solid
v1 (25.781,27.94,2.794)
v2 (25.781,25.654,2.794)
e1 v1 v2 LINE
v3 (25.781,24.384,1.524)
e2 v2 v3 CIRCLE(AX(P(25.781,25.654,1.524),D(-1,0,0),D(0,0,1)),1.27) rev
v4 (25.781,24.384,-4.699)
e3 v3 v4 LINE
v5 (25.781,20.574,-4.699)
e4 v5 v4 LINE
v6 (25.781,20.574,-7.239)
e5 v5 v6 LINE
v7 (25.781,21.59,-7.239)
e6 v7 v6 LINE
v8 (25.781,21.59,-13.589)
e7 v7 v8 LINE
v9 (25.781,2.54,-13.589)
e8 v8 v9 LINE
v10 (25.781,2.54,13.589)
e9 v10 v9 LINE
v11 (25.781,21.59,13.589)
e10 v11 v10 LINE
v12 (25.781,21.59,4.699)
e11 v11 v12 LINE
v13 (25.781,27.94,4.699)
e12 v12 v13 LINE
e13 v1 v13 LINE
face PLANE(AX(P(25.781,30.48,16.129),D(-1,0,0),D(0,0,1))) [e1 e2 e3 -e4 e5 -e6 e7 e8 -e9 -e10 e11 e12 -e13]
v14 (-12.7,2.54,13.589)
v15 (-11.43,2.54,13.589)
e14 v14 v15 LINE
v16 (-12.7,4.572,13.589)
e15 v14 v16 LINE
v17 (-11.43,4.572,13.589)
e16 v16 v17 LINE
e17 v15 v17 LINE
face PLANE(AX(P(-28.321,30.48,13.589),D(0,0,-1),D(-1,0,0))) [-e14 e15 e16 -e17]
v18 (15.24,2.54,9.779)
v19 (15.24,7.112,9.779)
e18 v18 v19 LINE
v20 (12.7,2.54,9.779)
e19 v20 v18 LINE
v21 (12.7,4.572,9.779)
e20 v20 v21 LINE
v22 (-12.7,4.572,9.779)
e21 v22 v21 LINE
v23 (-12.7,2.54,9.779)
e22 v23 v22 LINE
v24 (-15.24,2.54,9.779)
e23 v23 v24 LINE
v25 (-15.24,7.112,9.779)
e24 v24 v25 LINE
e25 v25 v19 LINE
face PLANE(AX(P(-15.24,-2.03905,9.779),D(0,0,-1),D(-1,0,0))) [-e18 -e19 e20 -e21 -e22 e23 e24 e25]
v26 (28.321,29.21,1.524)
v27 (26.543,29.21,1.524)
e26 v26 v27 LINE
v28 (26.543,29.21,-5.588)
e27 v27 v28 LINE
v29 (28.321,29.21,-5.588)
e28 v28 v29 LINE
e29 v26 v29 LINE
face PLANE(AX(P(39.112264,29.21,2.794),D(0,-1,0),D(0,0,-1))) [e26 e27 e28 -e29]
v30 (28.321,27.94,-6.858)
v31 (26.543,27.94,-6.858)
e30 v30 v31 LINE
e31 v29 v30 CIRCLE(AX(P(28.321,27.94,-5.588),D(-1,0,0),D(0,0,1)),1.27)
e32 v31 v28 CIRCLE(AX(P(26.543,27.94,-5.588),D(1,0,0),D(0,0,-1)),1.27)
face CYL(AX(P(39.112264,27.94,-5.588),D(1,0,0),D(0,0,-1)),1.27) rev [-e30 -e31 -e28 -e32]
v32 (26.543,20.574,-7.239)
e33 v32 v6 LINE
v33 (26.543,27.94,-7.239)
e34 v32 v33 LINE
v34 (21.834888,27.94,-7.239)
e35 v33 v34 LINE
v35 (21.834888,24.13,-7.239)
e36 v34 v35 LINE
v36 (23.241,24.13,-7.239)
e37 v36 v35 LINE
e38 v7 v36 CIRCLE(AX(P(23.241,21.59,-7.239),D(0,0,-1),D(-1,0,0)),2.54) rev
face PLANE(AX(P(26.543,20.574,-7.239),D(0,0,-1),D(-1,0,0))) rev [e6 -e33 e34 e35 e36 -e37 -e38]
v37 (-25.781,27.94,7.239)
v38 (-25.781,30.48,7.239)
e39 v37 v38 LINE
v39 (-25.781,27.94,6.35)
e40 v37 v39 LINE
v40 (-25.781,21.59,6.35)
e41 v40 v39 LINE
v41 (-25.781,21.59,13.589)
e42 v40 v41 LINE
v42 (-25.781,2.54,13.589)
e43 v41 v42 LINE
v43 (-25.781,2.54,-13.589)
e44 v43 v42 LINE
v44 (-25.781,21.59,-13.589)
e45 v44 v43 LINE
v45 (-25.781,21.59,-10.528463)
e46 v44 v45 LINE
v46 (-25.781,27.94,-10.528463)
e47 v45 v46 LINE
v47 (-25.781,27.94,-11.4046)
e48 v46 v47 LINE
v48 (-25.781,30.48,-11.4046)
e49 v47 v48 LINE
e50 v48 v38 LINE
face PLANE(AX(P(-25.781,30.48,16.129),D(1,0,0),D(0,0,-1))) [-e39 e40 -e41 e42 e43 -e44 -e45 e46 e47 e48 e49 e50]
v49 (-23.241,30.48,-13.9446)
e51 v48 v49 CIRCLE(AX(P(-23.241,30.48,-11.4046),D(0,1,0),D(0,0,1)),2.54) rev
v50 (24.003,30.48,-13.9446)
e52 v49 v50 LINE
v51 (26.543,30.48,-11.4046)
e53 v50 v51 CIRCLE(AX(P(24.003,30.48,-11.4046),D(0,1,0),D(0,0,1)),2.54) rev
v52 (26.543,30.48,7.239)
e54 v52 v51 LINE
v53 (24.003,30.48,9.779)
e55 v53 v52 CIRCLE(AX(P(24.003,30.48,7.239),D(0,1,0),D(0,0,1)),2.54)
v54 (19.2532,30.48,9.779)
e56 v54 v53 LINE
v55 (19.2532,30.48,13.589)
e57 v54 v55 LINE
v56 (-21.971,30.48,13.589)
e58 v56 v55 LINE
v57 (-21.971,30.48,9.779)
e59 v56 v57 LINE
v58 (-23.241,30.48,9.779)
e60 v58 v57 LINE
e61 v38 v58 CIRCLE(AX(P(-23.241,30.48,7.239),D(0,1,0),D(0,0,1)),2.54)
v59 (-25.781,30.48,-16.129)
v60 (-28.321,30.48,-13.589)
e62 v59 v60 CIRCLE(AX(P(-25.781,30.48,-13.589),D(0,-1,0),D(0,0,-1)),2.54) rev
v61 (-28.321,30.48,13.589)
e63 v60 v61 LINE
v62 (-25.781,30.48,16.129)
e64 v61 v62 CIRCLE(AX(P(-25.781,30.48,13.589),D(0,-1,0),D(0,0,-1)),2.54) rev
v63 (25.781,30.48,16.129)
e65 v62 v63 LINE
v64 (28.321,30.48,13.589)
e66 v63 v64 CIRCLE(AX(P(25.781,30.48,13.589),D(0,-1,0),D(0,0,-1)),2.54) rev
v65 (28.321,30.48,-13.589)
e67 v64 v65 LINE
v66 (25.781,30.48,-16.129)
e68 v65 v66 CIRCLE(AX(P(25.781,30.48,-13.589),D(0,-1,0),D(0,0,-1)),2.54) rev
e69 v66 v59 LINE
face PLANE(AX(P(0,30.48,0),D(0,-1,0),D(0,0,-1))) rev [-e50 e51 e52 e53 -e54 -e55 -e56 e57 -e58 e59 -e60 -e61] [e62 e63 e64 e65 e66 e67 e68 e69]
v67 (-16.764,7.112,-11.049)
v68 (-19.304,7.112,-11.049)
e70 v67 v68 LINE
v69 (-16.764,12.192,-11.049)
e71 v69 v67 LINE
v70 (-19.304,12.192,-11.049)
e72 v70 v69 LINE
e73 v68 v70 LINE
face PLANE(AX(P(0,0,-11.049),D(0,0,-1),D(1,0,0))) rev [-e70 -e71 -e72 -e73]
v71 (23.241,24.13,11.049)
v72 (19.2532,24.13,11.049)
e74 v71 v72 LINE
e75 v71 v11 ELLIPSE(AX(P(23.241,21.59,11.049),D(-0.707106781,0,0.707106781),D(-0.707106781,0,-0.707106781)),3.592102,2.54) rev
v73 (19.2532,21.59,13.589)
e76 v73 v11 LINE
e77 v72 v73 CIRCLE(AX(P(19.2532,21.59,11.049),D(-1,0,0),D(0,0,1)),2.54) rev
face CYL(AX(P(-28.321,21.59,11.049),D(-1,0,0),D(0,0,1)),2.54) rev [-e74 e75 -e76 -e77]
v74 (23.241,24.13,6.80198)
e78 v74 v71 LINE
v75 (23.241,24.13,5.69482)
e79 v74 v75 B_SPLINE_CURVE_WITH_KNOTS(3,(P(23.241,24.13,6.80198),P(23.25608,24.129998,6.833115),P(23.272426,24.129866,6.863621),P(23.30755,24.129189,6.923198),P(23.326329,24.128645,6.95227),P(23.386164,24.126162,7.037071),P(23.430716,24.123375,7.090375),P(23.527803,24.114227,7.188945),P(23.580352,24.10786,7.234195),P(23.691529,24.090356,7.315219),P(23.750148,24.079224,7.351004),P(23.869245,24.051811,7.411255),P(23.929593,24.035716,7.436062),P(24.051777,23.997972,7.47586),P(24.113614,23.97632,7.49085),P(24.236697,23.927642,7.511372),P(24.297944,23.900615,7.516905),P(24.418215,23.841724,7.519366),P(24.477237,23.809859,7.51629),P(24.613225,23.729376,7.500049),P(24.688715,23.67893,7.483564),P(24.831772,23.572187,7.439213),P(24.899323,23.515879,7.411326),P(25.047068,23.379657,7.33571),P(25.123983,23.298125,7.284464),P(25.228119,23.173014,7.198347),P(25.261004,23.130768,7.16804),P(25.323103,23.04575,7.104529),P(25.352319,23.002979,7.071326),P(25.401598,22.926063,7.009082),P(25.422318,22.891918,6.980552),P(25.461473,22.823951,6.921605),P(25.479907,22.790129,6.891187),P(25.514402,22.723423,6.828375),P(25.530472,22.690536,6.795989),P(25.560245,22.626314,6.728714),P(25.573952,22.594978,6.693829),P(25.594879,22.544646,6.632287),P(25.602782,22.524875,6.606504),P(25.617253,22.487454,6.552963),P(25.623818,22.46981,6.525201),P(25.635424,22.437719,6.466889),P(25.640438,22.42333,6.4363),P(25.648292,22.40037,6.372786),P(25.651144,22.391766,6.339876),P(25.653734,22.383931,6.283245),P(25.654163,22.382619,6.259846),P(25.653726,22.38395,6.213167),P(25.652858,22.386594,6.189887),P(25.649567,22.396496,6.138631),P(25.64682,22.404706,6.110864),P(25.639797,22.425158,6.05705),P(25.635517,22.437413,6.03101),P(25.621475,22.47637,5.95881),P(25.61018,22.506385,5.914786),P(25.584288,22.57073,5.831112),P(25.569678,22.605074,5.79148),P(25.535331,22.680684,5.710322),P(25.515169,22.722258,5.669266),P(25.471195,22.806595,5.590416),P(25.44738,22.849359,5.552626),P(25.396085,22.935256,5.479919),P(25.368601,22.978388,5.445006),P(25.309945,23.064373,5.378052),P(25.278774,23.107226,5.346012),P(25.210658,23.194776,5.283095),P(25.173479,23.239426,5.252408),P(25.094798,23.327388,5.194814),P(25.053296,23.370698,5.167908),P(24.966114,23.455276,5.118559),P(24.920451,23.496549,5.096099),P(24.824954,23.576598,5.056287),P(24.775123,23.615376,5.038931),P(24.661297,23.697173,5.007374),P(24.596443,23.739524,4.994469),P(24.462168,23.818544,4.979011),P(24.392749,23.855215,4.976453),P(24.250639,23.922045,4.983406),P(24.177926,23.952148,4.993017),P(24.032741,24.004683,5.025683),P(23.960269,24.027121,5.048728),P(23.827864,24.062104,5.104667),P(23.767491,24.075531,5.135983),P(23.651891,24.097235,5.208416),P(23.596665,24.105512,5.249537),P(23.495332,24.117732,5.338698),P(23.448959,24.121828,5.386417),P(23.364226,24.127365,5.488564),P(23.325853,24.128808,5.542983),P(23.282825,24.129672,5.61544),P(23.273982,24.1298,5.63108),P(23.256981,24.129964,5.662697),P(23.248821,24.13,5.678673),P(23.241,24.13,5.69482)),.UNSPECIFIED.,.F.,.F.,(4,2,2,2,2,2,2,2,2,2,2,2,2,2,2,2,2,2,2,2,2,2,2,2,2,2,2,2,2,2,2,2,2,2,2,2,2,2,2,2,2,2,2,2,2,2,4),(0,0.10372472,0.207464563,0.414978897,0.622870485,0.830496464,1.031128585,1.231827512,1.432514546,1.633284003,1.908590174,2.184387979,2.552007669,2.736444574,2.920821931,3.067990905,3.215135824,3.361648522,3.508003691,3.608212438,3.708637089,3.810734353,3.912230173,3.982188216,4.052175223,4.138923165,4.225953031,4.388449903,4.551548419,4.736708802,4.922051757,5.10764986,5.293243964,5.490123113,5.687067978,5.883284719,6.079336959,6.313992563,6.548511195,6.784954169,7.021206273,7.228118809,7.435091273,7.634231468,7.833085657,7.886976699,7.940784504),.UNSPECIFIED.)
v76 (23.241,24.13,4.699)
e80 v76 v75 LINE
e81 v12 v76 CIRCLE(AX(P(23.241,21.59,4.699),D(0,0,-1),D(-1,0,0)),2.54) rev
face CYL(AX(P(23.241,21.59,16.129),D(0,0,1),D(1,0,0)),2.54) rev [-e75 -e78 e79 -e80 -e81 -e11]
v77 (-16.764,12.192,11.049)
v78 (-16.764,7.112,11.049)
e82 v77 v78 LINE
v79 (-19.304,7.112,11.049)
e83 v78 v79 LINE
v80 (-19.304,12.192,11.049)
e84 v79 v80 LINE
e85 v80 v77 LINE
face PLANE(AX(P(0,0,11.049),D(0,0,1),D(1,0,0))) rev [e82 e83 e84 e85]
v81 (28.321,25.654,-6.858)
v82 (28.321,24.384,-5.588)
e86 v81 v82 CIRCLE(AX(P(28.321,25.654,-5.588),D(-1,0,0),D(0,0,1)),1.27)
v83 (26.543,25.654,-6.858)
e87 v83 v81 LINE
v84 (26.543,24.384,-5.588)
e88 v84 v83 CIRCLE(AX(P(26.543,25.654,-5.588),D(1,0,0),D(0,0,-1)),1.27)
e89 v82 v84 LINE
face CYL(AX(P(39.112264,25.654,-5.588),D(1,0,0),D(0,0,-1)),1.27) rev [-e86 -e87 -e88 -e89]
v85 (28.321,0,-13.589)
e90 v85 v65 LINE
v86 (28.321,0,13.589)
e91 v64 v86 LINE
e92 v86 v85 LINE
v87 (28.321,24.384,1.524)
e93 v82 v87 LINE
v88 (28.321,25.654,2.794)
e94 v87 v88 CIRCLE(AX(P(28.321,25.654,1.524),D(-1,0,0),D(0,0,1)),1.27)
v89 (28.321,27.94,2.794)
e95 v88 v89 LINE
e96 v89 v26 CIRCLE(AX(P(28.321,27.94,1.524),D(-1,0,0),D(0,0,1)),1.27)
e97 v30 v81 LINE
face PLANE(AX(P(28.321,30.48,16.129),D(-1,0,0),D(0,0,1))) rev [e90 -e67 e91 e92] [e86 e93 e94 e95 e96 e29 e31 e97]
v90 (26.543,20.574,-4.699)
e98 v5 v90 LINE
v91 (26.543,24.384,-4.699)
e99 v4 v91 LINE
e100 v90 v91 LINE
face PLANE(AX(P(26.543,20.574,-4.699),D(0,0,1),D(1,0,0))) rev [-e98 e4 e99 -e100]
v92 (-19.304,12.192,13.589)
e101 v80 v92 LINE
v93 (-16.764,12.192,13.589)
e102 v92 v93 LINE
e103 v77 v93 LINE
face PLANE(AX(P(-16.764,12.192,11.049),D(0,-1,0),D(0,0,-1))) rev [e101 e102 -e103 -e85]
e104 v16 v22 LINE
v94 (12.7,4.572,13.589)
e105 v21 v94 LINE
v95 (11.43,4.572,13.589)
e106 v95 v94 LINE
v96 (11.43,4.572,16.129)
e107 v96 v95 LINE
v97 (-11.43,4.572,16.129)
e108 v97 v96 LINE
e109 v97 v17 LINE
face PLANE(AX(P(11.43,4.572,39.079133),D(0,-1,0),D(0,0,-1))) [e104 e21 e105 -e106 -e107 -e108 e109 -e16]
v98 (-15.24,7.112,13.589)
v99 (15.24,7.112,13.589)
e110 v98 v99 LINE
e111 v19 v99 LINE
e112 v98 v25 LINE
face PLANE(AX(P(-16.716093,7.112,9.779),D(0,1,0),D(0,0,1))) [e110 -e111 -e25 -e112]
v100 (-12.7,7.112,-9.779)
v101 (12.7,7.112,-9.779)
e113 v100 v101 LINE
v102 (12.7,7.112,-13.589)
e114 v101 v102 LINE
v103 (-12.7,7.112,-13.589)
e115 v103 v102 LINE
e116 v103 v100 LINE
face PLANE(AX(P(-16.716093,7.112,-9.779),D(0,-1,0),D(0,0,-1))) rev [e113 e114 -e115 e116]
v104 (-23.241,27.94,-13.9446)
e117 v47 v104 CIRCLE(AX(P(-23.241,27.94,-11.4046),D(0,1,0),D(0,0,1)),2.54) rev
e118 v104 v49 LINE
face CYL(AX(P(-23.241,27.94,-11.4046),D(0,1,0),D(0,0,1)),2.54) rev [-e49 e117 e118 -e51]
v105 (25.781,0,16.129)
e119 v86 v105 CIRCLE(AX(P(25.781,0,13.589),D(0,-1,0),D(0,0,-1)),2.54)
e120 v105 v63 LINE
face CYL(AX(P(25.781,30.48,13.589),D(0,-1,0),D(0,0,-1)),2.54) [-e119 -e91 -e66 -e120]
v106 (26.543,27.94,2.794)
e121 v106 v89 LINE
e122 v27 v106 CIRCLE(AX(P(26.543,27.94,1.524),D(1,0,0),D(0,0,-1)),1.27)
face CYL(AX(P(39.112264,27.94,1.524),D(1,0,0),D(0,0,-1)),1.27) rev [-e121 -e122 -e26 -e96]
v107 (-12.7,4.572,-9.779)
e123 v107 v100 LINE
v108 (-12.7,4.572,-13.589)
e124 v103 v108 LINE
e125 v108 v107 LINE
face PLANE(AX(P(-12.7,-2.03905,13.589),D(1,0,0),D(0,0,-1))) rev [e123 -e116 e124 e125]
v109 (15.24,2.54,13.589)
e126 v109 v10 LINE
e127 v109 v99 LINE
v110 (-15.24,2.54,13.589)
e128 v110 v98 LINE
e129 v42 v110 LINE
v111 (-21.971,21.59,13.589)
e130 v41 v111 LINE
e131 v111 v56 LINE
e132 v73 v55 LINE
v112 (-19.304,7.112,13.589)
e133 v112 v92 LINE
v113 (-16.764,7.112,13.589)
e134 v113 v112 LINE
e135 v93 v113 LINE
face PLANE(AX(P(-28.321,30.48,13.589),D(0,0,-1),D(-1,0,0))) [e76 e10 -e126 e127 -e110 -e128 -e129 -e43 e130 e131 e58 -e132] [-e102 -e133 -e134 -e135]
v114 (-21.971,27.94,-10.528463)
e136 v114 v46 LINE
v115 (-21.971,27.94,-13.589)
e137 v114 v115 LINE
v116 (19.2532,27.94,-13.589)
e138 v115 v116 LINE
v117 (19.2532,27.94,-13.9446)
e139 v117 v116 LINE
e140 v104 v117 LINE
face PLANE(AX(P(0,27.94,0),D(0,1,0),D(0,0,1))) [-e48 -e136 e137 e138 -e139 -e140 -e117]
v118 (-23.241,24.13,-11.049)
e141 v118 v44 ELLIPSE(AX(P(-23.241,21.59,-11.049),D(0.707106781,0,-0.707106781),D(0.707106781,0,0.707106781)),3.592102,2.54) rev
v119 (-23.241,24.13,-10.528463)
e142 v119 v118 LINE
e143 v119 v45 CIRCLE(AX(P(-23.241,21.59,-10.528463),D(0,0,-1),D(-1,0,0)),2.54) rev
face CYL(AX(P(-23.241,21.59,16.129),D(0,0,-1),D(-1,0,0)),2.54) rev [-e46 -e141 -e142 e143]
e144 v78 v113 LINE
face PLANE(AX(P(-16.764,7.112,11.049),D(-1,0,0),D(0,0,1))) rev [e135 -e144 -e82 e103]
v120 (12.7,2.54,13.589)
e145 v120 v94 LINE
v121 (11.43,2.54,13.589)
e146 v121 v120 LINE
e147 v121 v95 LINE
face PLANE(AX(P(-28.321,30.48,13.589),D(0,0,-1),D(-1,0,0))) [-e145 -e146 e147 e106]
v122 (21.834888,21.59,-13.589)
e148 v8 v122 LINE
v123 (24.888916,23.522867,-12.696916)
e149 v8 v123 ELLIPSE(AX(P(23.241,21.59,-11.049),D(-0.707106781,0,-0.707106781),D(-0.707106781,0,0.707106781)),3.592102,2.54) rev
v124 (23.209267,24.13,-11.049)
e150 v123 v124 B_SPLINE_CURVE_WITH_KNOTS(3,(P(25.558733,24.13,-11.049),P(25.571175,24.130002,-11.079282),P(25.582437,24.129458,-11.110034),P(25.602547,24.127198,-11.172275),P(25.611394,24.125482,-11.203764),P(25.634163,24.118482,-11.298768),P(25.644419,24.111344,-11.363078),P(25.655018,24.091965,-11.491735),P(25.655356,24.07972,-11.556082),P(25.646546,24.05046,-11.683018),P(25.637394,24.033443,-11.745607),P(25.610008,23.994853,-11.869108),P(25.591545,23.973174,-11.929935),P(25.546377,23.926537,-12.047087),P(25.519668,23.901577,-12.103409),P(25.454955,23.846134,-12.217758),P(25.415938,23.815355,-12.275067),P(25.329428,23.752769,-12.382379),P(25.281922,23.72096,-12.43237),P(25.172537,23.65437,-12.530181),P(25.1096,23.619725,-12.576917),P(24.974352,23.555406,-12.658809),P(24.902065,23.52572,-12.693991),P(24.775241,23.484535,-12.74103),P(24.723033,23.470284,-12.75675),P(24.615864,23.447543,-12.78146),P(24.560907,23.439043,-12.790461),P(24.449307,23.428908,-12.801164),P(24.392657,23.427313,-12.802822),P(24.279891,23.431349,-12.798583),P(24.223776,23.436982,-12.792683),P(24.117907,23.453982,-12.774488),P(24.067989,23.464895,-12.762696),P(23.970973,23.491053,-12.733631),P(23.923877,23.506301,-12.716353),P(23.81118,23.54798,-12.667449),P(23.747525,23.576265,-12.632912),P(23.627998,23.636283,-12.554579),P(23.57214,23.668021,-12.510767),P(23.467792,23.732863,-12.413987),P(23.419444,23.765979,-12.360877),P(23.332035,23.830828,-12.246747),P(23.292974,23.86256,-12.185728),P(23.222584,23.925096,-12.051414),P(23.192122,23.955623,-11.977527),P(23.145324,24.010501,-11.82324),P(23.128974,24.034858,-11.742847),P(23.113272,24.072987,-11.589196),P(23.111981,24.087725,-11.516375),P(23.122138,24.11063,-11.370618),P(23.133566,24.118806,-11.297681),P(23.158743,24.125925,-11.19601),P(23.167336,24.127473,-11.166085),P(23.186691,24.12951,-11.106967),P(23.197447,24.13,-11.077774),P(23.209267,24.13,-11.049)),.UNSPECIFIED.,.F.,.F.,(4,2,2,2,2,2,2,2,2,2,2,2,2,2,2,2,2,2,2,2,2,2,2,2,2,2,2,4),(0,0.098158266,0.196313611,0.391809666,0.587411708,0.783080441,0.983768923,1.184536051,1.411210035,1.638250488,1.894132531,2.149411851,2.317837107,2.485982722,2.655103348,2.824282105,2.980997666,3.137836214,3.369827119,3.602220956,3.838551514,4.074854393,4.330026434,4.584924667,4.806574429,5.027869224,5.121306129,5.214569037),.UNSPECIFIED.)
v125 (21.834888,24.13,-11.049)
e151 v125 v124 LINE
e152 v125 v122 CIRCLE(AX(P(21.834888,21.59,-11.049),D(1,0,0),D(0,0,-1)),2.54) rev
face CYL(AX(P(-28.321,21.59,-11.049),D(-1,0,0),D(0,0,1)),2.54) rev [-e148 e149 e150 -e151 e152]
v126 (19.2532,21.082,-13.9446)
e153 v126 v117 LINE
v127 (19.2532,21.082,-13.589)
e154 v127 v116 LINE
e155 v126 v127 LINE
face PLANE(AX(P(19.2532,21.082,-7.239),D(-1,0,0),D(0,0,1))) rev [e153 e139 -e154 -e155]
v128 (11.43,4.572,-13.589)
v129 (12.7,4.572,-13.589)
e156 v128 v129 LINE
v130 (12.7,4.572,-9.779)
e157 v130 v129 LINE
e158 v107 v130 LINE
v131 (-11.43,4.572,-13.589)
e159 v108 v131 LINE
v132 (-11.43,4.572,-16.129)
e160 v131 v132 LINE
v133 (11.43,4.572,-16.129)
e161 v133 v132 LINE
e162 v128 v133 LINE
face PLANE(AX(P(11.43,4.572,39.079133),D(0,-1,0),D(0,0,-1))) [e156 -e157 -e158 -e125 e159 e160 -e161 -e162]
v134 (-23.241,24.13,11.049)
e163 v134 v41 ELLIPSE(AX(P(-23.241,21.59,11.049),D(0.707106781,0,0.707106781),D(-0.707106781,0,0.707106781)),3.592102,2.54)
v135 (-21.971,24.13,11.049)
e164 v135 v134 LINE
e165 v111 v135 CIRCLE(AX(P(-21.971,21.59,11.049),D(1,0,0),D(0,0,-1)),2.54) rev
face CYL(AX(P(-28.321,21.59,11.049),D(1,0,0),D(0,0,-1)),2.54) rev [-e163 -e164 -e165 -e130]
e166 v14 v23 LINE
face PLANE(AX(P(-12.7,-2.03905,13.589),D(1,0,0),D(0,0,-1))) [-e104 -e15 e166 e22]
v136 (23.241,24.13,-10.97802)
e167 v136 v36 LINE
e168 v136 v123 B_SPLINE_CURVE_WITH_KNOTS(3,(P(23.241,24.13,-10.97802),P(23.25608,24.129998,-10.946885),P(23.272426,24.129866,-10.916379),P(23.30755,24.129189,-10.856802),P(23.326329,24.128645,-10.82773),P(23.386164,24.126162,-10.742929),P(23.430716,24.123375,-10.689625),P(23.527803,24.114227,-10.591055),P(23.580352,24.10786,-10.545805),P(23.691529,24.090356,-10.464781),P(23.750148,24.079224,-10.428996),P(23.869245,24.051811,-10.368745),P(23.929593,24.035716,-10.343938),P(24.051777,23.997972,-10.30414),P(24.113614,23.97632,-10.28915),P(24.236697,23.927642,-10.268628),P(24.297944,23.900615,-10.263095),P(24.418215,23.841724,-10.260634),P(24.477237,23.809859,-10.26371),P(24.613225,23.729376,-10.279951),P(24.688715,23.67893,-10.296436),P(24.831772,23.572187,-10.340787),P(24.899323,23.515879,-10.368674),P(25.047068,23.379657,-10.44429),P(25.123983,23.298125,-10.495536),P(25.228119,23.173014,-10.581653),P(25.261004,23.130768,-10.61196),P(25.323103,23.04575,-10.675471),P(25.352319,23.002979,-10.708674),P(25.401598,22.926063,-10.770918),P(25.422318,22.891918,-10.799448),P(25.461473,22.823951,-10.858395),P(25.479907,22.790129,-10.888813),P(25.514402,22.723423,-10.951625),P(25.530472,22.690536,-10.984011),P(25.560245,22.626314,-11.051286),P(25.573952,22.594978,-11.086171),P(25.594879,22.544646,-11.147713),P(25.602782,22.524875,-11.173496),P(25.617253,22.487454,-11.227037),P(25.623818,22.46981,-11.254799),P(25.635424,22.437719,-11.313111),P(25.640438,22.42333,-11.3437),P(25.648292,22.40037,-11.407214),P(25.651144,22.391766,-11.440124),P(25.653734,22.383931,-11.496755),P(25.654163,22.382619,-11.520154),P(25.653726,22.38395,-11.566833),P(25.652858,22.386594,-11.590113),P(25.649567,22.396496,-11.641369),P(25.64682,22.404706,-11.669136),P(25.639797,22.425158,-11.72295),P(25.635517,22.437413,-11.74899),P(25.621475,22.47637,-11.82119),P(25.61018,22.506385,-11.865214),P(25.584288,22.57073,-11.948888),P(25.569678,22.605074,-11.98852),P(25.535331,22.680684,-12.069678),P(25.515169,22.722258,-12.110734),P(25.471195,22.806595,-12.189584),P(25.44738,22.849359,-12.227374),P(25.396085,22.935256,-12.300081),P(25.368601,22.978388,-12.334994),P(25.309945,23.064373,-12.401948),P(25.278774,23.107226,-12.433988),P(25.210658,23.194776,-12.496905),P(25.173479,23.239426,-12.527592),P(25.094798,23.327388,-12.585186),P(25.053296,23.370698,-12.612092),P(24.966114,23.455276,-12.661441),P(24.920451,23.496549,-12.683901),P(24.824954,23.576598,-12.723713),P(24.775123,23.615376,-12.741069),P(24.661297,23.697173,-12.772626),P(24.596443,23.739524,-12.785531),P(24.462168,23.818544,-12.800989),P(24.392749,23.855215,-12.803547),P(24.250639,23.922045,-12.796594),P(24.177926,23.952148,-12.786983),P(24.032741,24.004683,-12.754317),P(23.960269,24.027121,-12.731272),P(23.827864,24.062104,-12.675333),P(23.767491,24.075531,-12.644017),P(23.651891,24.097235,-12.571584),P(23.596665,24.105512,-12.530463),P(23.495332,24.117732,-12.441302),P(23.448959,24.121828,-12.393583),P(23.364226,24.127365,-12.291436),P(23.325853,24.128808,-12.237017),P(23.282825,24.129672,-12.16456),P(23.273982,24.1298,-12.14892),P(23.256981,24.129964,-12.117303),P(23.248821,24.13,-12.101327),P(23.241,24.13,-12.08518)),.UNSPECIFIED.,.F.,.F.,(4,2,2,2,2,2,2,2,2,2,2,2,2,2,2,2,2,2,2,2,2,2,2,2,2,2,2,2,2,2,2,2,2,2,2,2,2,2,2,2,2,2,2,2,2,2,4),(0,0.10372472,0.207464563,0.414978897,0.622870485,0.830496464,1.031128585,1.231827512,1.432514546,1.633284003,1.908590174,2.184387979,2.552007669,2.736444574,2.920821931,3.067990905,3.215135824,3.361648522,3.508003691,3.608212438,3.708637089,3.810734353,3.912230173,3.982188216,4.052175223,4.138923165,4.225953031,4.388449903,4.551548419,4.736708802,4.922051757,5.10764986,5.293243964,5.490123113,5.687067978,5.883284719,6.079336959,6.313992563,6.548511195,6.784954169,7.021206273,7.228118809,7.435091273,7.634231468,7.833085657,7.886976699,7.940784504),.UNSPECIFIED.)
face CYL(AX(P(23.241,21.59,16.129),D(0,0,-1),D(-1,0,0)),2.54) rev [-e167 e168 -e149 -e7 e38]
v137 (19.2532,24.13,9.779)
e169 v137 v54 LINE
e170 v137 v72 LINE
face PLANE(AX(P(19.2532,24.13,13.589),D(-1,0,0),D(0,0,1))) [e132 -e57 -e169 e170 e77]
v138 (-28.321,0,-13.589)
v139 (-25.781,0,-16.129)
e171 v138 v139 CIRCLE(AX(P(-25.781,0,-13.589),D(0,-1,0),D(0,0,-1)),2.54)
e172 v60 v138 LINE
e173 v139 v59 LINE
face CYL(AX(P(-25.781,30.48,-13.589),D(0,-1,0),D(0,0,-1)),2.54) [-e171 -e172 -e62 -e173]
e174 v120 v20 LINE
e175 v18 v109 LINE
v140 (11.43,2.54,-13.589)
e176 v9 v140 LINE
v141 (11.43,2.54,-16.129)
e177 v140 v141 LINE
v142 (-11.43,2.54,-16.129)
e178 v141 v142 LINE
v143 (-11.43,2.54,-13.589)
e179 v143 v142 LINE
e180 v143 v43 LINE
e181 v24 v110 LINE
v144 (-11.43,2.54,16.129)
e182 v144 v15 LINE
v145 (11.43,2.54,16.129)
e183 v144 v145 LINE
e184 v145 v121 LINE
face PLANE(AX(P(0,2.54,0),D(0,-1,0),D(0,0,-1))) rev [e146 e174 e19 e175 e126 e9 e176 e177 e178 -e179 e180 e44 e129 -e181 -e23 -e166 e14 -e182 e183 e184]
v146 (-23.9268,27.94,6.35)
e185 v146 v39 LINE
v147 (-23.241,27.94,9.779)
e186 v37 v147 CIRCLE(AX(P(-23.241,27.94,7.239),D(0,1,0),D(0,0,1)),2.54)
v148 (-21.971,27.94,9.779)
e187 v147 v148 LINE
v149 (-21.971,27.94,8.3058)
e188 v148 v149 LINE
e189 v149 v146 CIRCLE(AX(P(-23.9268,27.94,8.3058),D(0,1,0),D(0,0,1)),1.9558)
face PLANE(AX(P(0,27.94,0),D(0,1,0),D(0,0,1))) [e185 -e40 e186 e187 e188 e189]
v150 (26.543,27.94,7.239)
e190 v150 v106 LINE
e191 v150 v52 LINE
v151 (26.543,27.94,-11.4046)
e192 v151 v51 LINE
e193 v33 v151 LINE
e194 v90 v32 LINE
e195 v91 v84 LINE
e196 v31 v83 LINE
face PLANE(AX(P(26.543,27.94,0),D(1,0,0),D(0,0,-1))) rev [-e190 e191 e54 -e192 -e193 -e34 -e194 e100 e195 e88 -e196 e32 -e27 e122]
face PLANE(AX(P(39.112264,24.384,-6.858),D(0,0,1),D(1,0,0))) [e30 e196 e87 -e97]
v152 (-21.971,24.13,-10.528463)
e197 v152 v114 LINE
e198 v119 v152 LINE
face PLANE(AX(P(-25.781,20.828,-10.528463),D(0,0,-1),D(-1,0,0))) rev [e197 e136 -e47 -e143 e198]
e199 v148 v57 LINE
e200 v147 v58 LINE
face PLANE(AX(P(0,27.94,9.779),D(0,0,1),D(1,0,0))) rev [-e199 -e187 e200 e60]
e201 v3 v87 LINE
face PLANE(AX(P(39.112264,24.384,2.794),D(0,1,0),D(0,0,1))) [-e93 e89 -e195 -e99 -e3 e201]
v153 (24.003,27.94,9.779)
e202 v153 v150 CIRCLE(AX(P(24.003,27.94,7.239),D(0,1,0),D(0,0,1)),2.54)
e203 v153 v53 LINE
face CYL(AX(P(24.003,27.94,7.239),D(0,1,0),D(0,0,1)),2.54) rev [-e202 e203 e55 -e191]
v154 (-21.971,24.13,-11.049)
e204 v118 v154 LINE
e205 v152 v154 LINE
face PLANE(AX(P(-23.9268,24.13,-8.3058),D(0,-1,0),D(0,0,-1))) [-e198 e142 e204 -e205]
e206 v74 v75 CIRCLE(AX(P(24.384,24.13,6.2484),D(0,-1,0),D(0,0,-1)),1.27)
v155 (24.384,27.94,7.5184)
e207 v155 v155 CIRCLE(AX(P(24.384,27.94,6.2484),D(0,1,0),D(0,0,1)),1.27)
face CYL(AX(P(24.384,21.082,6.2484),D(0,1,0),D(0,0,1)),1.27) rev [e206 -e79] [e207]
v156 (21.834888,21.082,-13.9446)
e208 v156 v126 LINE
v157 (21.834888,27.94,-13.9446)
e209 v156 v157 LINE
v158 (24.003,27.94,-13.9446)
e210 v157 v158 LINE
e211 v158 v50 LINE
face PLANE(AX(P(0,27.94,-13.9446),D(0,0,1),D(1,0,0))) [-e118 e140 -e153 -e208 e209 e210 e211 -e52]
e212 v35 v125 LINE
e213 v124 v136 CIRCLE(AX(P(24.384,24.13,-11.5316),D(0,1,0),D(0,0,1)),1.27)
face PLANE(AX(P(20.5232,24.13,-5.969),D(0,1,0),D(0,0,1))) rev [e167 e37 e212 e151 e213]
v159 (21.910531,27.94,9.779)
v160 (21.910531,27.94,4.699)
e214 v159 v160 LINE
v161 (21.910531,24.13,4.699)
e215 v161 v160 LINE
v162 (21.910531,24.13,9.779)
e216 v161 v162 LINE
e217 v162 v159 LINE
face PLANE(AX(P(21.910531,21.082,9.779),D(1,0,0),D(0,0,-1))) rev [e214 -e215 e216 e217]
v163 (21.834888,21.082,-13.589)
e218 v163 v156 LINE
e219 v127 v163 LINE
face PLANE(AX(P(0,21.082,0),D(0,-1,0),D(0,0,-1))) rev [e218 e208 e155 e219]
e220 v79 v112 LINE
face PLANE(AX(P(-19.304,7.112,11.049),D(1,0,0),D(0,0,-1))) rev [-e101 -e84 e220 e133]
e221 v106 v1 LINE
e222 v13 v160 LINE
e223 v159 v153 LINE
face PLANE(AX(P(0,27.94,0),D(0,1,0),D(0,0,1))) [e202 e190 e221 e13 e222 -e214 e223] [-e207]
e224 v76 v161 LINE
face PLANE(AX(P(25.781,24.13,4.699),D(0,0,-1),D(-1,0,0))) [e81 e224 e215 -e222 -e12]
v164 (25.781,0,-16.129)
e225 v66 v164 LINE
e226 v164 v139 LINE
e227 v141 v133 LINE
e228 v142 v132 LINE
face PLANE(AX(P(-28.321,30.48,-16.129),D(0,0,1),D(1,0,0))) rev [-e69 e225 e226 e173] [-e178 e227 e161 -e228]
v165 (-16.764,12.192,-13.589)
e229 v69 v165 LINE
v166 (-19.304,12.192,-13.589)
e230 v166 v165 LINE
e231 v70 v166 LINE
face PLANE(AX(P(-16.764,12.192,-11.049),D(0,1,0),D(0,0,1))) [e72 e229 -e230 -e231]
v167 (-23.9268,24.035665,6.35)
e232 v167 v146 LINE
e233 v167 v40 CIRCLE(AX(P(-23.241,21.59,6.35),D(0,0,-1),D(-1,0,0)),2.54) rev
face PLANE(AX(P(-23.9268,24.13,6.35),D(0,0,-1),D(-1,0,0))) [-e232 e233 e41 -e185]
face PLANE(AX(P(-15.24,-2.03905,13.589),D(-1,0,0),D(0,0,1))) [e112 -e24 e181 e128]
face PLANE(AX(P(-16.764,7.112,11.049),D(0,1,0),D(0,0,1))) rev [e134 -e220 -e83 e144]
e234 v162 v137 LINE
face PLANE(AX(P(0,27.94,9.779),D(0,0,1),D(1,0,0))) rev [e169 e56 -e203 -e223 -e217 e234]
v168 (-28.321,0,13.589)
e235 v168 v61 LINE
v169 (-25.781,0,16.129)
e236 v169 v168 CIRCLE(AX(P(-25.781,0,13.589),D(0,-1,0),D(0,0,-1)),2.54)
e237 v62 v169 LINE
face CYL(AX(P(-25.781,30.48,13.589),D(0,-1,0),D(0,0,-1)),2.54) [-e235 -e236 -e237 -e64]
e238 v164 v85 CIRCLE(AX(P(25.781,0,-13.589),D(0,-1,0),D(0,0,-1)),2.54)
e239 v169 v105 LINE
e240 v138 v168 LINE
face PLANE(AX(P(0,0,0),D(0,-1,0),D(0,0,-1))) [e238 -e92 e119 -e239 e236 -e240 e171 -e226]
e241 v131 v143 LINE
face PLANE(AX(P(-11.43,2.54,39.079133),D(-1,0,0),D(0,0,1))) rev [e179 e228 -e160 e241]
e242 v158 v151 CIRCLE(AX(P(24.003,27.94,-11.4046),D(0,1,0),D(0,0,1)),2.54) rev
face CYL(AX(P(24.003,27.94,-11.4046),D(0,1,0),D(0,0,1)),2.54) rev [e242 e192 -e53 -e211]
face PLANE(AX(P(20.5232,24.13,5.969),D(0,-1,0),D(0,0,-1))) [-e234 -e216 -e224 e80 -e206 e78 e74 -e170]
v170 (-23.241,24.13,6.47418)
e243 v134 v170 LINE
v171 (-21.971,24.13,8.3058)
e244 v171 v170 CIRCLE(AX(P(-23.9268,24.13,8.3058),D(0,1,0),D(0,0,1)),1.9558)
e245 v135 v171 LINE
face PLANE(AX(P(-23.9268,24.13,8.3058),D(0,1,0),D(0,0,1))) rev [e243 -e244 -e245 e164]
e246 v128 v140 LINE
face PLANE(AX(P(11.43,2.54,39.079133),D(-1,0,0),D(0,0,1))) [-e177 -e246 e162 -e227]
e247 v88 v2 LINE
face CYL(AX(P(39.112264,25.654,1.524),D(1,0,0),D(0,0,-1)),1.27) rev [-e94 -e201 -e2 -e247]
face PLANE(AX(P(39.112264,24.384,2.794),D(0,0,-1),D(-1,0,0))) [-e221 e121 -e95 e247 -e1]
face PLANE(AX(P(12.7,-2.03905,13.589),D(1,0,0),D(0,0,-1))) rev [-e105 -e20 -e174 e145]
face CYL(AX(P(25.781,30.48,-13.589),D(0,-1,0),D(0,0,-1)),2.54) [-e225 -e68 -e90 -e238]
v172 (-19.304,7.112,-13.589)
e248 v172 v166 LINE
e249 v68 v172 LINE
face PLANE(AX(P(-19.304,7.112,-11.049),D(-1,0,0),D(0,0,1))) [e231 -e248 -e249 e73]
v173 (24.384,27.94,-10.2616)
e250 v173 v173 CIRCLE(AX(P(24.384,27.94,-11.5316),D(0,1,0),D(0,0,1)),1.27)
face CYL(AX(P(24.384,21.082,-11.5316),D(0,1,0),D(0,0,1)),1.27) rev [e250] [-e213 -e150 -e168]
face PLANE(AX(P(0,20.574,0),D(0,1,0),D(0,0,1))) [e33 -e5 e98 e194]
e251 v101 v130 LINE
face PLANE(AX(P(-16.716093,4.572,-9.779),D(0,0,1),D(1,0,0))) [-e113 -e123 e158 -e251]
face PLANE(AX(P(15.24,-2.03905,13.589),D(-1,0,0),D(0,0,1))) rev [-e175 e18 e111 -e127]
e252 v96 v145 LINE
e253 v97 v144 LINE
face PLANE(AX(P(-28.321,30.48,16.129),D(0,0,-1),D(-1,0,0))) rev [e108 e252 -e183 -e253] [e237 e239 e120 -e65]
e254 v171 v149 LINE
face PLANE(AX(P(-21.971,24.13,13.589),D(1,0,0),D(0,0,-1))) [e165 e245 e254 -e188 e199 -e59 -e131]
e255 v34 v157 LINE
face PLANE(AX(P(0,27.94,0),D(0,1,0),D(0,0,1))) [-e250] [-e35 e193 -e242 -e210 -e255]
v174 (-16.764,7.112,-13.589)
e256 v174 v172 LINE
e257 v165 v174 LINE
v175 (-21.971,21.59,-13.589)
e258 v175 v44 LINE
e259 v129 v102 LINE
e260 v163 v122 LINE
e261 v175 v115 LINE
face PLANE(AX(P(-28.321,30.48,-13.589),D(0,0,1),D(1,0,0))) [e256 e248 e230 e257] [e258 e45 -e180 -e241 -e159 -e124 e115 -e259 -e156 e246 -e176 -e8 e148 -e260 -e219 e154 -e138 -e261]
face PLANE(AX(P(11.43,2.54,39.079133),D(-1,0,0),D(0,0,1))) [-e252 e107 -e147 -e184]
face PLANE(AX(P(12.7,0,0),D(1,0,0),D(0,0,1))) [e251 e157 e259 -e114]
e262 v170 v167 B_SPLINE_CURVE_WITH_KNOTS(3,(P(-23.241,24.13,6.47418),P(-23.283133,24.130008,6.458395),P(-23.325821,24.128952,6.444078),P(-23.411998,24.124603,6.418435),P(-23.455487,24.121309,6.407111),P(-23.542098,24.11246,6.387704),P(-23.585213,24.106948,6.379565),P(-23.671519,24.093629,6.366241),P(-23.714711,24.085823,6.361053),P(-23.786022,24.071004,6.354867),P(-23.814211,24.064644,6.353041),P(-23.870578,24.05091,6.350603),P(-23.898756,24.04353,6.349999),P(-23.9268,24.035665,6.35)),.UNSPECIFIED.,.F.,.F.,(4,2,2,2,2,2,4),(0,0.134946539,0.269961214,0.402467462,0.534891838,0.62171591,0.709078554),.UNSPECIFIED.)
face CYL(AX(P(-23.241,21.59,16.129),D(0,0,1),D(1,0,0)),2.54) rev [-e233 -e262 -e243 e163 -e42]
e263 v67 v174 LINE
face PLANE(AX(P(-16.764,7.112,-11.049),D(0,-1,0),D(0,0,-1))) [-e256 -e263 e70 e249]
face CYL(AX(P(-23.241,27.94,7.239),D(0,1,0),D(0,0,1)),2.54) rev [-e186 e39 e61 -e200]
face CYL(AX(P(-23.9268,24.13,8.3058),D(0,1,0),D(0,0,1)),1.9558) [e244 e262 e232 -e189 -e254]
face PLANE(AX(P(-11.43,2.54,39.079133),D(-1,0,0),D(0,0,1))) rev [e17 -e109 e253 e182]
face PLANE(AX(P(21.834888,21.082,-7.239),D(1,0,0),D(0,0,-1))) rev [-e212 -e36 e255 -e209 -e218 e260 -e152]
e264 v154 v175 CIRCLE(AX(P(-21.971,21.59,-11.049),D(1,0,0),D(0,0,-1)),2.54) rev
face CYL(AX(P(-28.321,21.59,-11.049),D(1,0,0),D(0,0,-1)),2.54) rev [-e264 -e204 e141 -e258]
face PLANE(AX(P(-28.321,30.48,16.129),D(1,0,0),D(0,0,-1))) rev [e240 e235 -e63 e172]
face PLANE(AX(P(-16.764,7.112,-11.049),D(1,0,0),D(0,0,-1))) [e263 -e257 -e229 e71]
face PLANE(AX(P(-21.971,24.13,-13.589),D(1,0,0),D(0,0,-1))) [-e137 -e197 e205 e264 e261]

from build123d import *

# Parameters (mm, degrees)
SKETCH1_W           = 56.642
SKETCH1_H           = 32.258
BOSS_EXTRUDE1_DEPTH = 30.48
SHELL1_T            = -2.54
BOSS_EXTRUDE2_DEPTH = 6.35
FILLET2_R           = 2.54
FILLET3_R           = 2.54
CUT_EXTRUDE9_REACH  = 54.647
SKETCH10_W          = 22.86
SKETCH10_H          = 2.032
BOSS_EXTRUDE3_REACH = 46.623
SKETCH13_W          = 2.54
SKETCH13_H          = 3.81
SKETCH14_W          = 3.81
SKETCH14_H          = 1.27
BOSS_EXTRUDE4_DEPTH = 25.4
CUT_EXTRUDE10_DEPTH = 2.54
CUT_EXTRUDE11_REACH = 46.623
SKETCH16_W          = 9.652
SKETCH16_H          = 4.826
SKETCH11_R          = 1.27
CUT_EXTRUDE12_DEPTH = 9.398
MIRROR2_START       = 4.572
MIRROR2_OUTLINE_W   = 25.4
MIRROR2_OUTLINE_H   = 3.81
MIRROR2_DEPTH       = 2.54
SKETCH17_W          = 2.54
SKETCH17_H          = 3.81
CUT_EXTRUDE13_DEPTH = 23.368
SKETCH18_W          = 7.2898
SKETCH18_H          = 2.54
CUT_EXTRUDE14_DEPTH = 7.366
FILLET4_R           = 1.27
SKETCH19_W          = 2.54
SKETCH19_H          = 5.08
BOSS_EXTRUDE5_DEPTH = 2.54
CUT_EXTRUDE15_START = -23.368
SKETCH20_W          = 2.54
SKETCH20_H          = 3.81
CUT_EXTRUDE15_DEPTH = 23.368
SKETCH22_W          = 2.657331224
SKETCH22_H          = 5.08
CUT_EXTRUDE18_DEPTH = 6.858
SKETCH23_W          = 2.581688451
SKETCH23_H          = 6.7056
CUT_EXTRUDE19_DEPTH = 6.858
SKETCH24_W          = 4.254264989
SKETCH24_H          = 4.461970644
CUT_EXTRUDE20_DEPTH = 7.112


# Read off the part's stored shape, not the designer's step: Mirror2
with BuildPart() as part:
    # Sketch1 → Boss-Extrude1 (new body)
    with BuildSketch(Plane(origin=(0, 0, 0), x_dir=(1, 0, 0), z_dir=(0, 1, 0))):
        Rectangle(SKETCH1_W, SKETCH1_H)
    extrude(amount=BOSS_EXTRUDE1_DEPTH)

    # Shell1
    shell1_openings = [part.faces().sort_by_distance(p)[0] for p in [
        (0, 30.48, 0),
    ]]
    offset(amount=SHELL1_T, openings=shell1_openings, kind=Kind.INTERSECTION)

    # Sketch3 → Boss-Extrude2 (add)
    with BuildSketch(Plane(origin=(0, 30.48, 0), x_dir=(1, 0, 0), z_dir=(0, 1, 0))):
        with BuildLine():
            Line((-25.781, 13.589), (-25.781, 6.35))
            Line((-25.781, 6.35), (-23.9268, 6.35))
            ThreePointArc((-23.9268, 6.35), (-22.543840557, 6.922840557), (-21.971, 8.3058))
            Line((-21.971, 8.3058), (-21.971, 13.589))
            Line((-21.971, 13.589), (-25.781, 13.589))
        make_face()
        with BuildLine():
            Line((-21.971, -13.589), (-21.971, -8.3058))
            ThreePointArc((-21.971, -8.3058), (-22.543840557, -6.922840557), (-23.9268, -6.35))
            Line((-23.9268, -6.35), (-25.781, -6.35))
            Line((-25.781, -6.35), (-25.781, -13.589))
            Line((-25.781, -13.589), (-21.971, -13.589))
        make_face()
        with BuildLine():
            Line((25.781, 13.589), (19.2532, 13.589))
            Line((19.2532, 13.589), (19.2532, 5.969))
            ThreePointArc((19.2532, 5.969), (19.625174388, 5.070974388), (20.5232, 4.699))
            Line((20.5232, 4.699), (25.781, 4.699))
            Line((25.781, 4.699), (25.781, 13.589))
        make_face()
        with BuildLine():
            Line((25.781, -4.699), (25.781, -13.589))
            Line((25.781, -13.589), (19.2532, -13.589))
            Line((19.2532, -13.589), (19.2532, -5.969))
            ThreePointArc((19.2532, -5.969), (19.625174388, -5.070974388), (20.5232, -4.699))
            Line((20.5232, -4.699), (25.781, -4.699))
        make_face()
    extrude(amount=-BOSS_EXTRUDE2_DEPTH)

    # Fillet2
    fillet2_edges = [part.edges().sort_by_distance(p)[0] for p in [
        (28.321, 15.24, 16.129),
        (-28.321, 15.24, 16.129),
        (-28.321, 15.24, -16.129),
        (28.321, 15.24, -16.129),
    ]]
    fillet(fillet2_edges, radius=FILLET2_R)

    # Fillet3
    fillet3_edges = [part.edges().sort_by_distance(p)[0] for p in [
        (-25.781, 24.13, 9.9695),
        (-23.876, 24.13, 13.589),
        (22.5171, 24.13, 13.589),
        (25.781, 24.13, 9.144),
        (-23.876, 24.13, -13.589),
        (-25.781, 24.13, -9.9695),
        (22.5171, 24.13, -13.589),
        (25.781, 24.13, -9.144),
    ]]
    fillet(fillet3_edges, radius=FILLET3_R)

    # Cut-Extrude9: up to this face of the body (flat: up to its plane)
    cut_extrude9_end = Plane(part.part.faces().sort_by_distance((0, 15.24, 16.129))[0])
    # Sketch10 → Cut-Extrude9 (cut, up to the picked face)
    with BuildSketch(Plane(origin=(0, 0, -16.129), x_dir=(-1, 0, 0), z_dir=(0, 0, -1)), mode=Mode.PRIVATE) as cut_extrude9_sk1:
        with Locations((0, 3.556)):
            Rectangle(SKETCH10_W, SKETCH10_H)
    cut_extrude9_tool1 = split(extrude(cut_extrude9_sk1.sketch, amount=-CUT_EXTRUDE9_REACH, mode=Mode.PRIVATE), bisect_by=cut_extrude9_end, keep=Keep.BOTH, mode=Mode.PRIVATE)
    add(cut_extrude9_tool1.solids().sort_by(Axis((0, 3.556, -16.129), (0, 0, 1)))[0], mode=Mode.SUBTRACT)

    # Sketch13 → Boss-Extrude3 (add, up to next)
    with BuildSketch(Plane(origin=(0, 30.48, 0), x_dir=(1, 0, 0), z_dir=(0, 1, 0)), mode=Mode.PRIVATE) as boss_extrude3_sk1:
        with Locations((-13.97, -11.684)):
            Rectangle(SKETCH13_W, SKETCH13_H)
    boss_extrude3_tool1 = extrude(boss_extrude3_sk1.sketch, amount=-BOSS_EXTRUDE3_REACH, mode=Mode.PRIVATE) - part.part
    boss_extrude3 = boss_extrude3_tool1.solids().sort_by_distance((-13.97, 30.48, 11.684))[0]
    add(boss_extrude3)

    # Mirror1: Boss-Extrude3 across plane
    add(boss_extrude3.mirror(Plane(origin=(0, 0, 0), x_dir=(0, 0, 1), z_dir=(1, 0, 0))))

    # Sketch14 → Boss-Extrude4 (add)
    with BuildSketch(Plane.ZY.offset(-12.7)):
        with Locations((11.684, 5.207)):
            Rectangle(SKETCH14_W, SKETCH14_H)
    extrude(amount=BOSS_EXTRUDE4_DEPTH)

    # Sketch15 → Cut-Extrude10 (cut)
    with BuildSketch(Plane(origin=(0, 30.48, 0), x_dir=(1, 0, 0), z_dir=(0, 1, 0))):
        with BuildLine():
            Line((-25.781, 11.4046), (-25.781, 6.35))
            Line((-25.781, 6.35), (-23.9268, 6.35))
            ThreePointArc((-23.9268, 6.35), (-22.543840557, 6.922840557), (-21.971, 8.3058))
            Line((-21.971, 8.3058), (-21.971, 13.589))
            Line((-21.971, 13.589), (19.2532, 13.589))
            Line((19.2532, 13.589), (19.2532, 5.969))
            ThreePointArc((19.2532, 5.969), (19.625174388, 5.070974388), (20.5232, 4.699))
            Line((20.5232, 4.699), (25.781, 4.699))
            Line((25.781, 4.699), (25.781, -4.699))
            Line((25.781, -4.699), (20.5232, -4.699))
            ThreePointArc((20.5232, -4.699), (19.625174388, -5.070974388), (19.2532, -5.969))
            Line((19.2532, -5.969), (19.2532, -9.779))
            Line((19.2532, -9.779), (24.003, -9.779))
            ThreePointArc((24.003, -9.779), (25.799051224, -9.035051224), (26.543, -7.239))
            Line((26.543, -7.239), (26.543, -1.000588636))
            Line((26.543, -1.000588636), (26.543, 5.166188636))
            Line((26.543, 5.166188636), (26.543, 11.4046))
            ThreePointArc((26.543, 11.4046), (25.799051224, 13.200651224), (24.003, 13.9446))
            Line((24.003, 13.9446), (-23.241, 13.9446))
            ThreePointArc((-23.241, 13.9446), (-25.037051224, 13.200651224), (-25.781, 11.4046))
        make_face()
        with BuildLine():
            Line((-25.781, -6.35), (-25.781, -7.239))
            ThreePointArc((-25.781, -7.239), (-25.037051224, -9.035051224), (-23.241, -9.779))
            Line((-23.241, -9.779), (-21.971, -9.779))
            Line((-21.971, -9.779), (-21.971, -8.3058))
            ThreePointArc((-21.971, -8.3058), (-22.543840557, -6.922840557), (-23.9268, -6.35))
            Line((-23.9268, -6.35), (-25.781, -6.35))
        make_face()
    extrude(amount=-CUT_EXTRUDE10_DEPTH, mode=Mode.SUBTRACT)

    # Cut-Extrude11: up to this face of the body (flat: up to its plane)
    cut_extrude11_end = Plane(part.part.faces().sort_by_distance((28.321, 15.24, 0))[0])
    # Sketch16 → Cut-Extrude11 (cut, up to the picked face)
    with BuildSketch(Plane(origin=(0, 0, 0), x_dir=(0, 0, -1), z_dir=(1, 0, 0)), mode=Mode.PRIVATE) as cut_extrude11_sk1:
        with Locations((2.032, 26.797)):
            Rectangle(SKETCH16_W, SKETCH16_H)
    cut_extrude11_tool1 = split(extrude(cut_extrude11_sk1.sketch, amount=CUT_EXTRUDE11_REACH, mode=Mode.PRIVATE), bisect_by=cut_extrude11_end, keep=Keep.BOTH, mode=Mode.PRIVATE)
    add(cut_extrude11_tool1.solids().sort_by(Axis((0, 26.797, -2.032), (1, 0, 0)))[0], mode=Mode.SUBTRACT)

    # Sketch11 → Cut-Extrude12 (cut)
    with BuildSketch(Plane(origin=(0, 30.48, 0), x_dir=(1, 0, 0), z_dir=(0, 1, 0))):
        with Locations(Location((24.384, 11.5316, 0), (0, 0, 270))):
            Circle(SKETCH11_R)
        with Locations(Location((24.384, -6.2484, 0), (0, 0, 270))):
            Circle(SKETCH11_R)
    extrude(amount=-CUT_EXTRUDE12_DEPTH, mode=Mode.SUBTRACT)

    # Mirror2 outline → Mirror2 (add)
    with BuildSketch(Plane(origin=(0, 0, 0), x_dir=(1, 0, 0), z_dir=(0, 1, 0)).offset(MIRROR2_START)):
        with Locations((0, 11.684)):
            Rectangle(MIRROR2_OUTLINE_W, MIRROR2_OUTLINE_H)
        with Locations((0, -11.684)):
            Rectangle(MIRROR2_OUTLINE_W, MIRROR2_OUTLINE_H)
    extrude(amount=MIRROR2_DEPTH)

    # Sketch17 → Cut-Extrude13 (cut)
    with BuildSketch(Plane(origin=(0, 30.48, 0), x_dir=(1, 0, 0), z_dir=(0, 1, 0))):
        with Locations((-13.97, -11.684)):
            Rectangle(SKETCH17_W, SKETCH17_H)
    extrude(amount=-CUT_EXTRUDE13_DEPTH, mode=Mode.SUBTRACT)

    # Sketch18 → Cut-Extrude14 (cut)
    with BuildSketch(Plane(origin=(0, 27.94, 0), x_dir=(1, 0, 0), z_dir=(0, 1, 0))):
        with Locations((22.8981, 5.969)):
            Rectangle(SKETCH18_W, SKETCH18_H)
    extrude(amount=-CUT_EXTRUDE14_DEPTH, mode=Mode.SUBTRACT)

    # Fillet4
    fillet4_edges = [part.edges().sort_by_distance(p)[0] for p in [
        (27.432, 29.21, -6.858),
        (27.432, 24.384, -6.858),
        (27.051, 24.384, 2.794),
        (27.432, 29.21, 2.794),
    ]]
    fillet(fillet4_edges, radius=FILLET4_R)

    # Sketch19 → Boss-Extrude5 (add)
    with BuildSketch(Plane(origin=(0, 0, 13.589), x_dir=(-1, 0, 0), z_dir=(0, 0, -1))):
        with Locations((18.034, 9.652)):
            Rectangle(SKETCH19_W, SKETCH19_H)
    boss_extrude5 = extrude(amount=BOSS_EXTRUDE5_DEPTH)

    # Mirror3: Boss-Extrude5 across plane
    add(boss_extrude5.mirror(Plane.XY))

    # Sketch20 → Cut-Extrude15 (cut)
    with BuildSketch(Plane(origin=(0, 30.48, 0), x_dir=(1, 0, 0), z_dir=(0, 1, 0)).offset(CUT_EXTRUDE15_START)):
        with Locations((13.97, -11.684)):
            Rectangle(SKETCH20_W, SKETCH20_H)
    extrude(amount=CUT_EXTRUDE15_DEPTH, mode=Mode.SUBTRACT)

    # Sketch22 → Cut-Extrude18 (cut)
    with BuildSketch(Plane(origin=(0, 27.94, 0), x_dir=(1, 0, 0), z_dir=(0, 1, 0))):
        with Locations((20.581865612, -7.239)):
            Rectangle(SKETCH22_W, SKETCH22_H)
    extrude(amount=-CUT_EXTRUDE18_DEPTH, mode=Mode.SUBTRACT)

    # Sketch23 → Cut-Extrude19 (cut)
    with BuildSketch(Plane(origin=(0, 27.94, 0), x_dir=(1, 0, 0), z_dir=(0, 1, 0))):
        with Locations((20.544044226, 10.5918)):
            Rectangle(SKETCH23_W, SKETCH23_H)
    extrude(amount=-CUT_EXTRUDE19_DEPTH, mode=Mode.SUBTRACT)

    # Sketch24 → Cut-Extrude20 (cut)
    with BuildSketch(Plane(origin=(0, 27.94, 0), x_dir=(1, 0, 0), z_dir=(0, 1, 0))):
        with Locations((-23.653867506, 8.297478086)):
            Rectangle(SKETCH24_W, SKETCH24_H)
    extrude(amount=-CUT_EXTRUDE20_DEPTH, mode=Mode.SUBTRACT)


solid = part.part
